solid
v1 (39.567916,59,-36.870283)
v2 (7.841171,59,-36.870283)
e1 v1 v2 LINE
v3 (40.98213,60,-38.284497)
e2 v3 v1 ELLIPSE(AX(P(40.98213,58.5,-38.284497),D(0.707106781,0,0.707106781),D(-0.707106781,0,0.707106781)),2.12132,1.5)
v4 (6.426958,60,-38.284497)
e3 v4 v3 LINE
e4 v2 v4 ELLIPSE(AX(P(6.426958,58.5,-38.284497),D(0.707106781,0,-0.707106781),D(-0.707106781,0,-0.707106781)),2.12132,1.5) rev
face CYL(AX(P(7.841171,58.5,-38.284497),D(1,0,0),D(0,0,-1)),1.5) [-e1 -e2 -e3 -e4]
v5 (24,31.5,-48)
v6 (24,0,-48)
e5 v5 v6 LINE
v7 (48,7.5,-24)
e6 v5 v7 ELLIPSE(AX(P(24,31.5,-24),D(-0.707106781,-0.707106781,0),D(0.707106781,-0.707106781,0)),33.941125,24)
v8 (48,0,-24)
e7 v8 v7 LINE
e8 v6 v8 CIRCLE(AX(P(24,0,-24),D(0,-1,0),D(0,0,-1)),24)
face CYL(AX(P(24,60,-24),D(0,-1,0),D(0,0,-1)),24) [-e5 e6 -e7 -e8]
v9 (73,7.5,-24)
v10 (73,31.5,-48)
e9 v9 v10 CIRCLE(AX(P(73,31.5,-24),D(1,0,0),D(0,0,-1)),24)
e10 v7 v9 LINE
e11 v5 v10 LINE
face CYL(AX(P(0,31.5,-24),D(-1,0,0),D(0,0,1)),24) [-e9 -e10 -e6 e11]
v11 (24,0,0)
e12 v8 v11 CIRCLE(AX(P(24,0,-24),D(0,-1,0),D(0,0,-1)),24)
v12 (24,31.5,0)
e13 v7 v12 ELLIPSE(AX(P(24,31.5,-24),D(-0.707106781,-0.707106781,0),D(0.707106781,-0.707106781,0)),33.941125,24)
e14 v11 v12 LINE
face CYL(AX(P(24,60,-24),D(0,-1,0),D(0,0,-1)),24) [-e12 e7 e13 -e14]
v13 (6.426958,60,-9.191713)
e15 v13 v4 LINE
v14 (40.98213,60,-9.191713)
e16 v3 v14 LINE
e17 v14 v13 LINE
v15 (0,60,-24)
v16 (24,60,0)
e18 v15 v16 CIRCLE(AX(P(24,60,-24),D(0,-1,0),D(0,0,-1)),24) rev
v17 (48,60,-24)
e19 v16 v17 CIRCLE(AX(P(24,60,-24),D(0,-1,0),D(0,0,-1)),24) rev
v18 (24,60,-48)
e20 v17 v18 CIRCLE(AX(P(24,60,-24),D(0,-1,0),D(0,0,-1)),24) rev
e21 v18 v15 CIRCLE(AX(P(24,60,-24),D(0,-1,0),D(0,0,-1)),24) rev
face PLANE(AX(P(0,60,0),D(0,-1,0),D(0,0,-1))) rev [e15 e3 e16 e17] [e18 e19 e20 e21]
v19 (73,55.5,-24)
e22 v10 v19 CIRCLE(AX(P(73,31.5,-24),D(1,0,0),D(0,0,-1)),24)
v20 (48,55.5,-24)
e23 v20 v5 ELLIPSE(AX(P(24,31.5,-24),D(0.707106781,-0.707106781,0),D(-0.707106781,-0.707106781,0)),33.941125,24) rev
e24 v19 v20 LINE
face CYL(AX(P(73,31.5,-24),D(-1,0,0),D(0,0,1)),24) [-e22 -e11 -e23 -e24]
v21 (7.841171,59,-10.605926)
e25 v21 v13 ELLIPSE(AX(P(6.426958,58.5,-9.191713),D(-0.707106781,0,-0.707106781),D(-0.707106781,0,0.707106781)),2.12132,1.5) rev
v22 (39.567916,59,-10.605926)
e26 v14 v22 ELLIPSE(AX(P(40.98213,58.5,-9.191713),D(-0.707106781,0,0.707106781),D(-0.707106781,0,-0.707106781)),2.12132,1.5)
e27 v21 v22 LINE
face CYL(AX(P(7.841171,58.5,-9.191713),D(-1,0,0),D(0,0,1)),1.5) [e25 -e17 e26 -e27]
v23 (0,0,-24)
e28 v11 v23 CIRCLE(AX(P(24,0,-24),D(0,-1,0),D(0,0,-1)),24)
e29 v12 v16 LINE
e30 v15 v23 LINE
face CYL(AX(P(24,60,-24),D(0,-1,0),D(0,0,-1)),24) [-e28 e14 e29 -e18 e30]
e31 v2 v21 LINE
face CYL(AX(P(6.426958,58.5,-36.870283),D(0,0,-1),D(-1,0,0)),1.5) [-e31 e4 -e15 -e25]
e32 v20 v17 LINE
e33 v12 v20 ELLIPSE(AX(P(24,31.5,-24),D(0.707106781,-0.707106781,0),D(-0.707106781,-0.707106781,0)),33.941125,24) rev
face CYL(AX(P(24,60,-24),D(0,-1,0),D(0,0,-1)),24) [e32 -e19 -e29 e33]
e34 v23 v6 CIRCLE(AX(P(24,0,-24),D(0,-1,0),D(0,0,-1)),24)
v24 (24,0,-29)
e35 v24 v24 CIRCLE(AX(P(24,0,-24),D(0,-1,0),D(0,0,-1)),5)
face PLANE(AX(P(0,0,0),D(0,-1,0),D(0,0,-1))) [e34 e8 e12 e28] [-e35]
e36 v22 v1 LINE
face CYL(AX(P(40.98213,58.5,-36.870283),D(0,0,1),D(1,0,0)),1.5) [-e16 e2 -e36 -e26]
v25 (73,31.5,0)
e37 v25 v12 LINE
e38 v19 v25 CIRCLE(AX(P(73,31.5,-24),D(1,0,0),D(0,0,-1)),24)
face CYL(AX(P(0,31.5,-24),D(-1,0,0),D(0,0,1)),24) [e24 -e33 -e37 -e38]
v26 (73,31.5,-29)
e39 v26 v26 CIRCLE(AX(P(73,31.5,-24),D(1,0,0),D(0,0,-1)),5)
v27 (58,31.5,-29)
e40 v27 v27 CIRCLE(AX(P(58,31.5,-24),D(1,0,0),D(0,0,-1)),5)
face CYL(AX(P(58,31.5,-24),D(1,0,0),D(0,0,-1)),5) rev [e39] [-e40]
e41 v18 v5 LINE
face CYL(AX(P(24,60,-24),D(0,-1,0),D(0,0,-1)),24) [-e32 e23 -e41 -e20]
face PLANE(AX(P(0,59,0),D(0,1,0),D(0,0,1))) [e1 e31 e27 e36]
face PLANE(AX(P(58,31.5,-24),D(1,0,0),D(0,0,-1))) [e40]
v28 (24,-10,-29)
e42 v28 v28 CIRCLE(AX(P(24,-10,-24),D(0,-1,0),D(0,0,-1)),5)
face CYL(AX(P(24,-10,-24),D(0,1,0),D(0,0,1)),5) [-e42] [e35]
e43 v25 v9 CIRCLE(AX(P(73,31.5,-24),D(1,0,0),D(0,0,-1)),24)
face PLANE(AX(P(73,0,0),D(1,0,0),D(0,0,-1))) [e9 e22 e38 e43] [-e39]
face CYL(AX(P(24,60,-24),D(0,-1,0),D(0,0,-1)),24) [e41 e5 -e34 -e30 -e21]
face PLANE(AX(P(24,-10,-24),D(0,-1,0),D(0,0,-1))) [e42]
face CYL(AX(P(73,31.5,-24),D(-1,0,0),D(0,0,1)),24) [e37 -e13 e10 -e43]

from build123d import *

# Parameters (mm, degrees)
SKETCH1_W           = 48
SKETCH1_H           = 48
BOSS_EXTRUDE1_DEPTH = 60
SKETCH2_W           = 48
SKETCH2_H           = 48
BOSS_EXTRUDE2_DEPTH = 25
FILLET1_R           = 24
SKETCH3_R           = 5
BOSS_EXTRUDE3_DEPTH = 10
SKETCH4_R           = 5
CUT_EXTRUDE1_DEPTH  = 15
SKETCH5_W           = 31.72674495
SKETCH5_H           = 26.264357258
CUT_EXTRUDE2_DEPTH  = 2
SKETCH8_W           = 31.72674495
SKETCH8_H           = 26.264357258
BOSS_EXTRUDE6_DEPTH = 1
FILLET3_R           = 1.5


# Some blends are built 0.0001 mm under size
with BuildPart() as part:
    # Sketch1 → Boss-Extrude1 (new body)
    with BuildSketch(Plane(origin=(0, 0, 0), x_dir=(1, 0, 0), z_dir=(0, 1, 0))):
        with Locations((24, 24)):
            Rectangle(SKETCH1_W, SKETCH1_H)
    extrude(amount=BOSS_EXTRUDE1_DEPTH)

    # Sketch2 → Boss-Extrude2 (add)
    with BuildSketch(Plane(origin=(48, 0, 0), x_dir=(0, 0, -1), z_dir=(1, 0, 0))):
        with Locations((24, 31.5)):
            Rectangle(SKETCH2_W, SKETCH2_H)
    extrude(amount=BOSS_EXTRUDE2_DEPTH)

    # Fillet1
    fillet1_edges = [part.edges().sort_by_distance(p)[0] for p in [
        (0, 30, 0),
        (0, 30, -48),
        (48, 57.75, -48),
        (48, 57.75, 0),
        (48, 3.75, -48),
        (48, 3.75, 0),
        (60.5, 7.5, 0),
        (60.5, 55.5, 0),
        (60.5, 7.5, -48),
        (60.5, 55.5, -48),
    ]]
    fillet(fillet1_edges, radius=FILLET1_R - 0.0001)  # a hair under: the kernel refuses the full size

    # Sketch3 → Boss-Extrude3 (add)
    with BuildSketch(Plane(origin=(0, 0, 0), x_dir=(-1, 0, 0), z_dir=(0, -1, 0))):
        with Locations(Location((-24, 24, 0), (0, 0, 90))):
            Circle(SKETCH3_R)
    extrude(amount=BOSS_EXTRUDE3_DEPTH)

    # Sketch4 → Cut-Extrude1 (cut)
    with BuildSketch(Plane(origin=(73, 0, 0), x_dir=(0, 0, -1), z_dir=(1, 0, 0))):
        with Locations((24, 31.5)):
            Circle(SKETCH4_R)
    extrude(amount=-CUT_EXTRUDE1_DEPTH, mode=Mode.SUBTRACT)

    # Sketch5 → Cut-Extrude2 (cut)
    with BuildSketch(Plane(origin=(0, 60, 0), x_dir=(1, 0, 0), z_dir=(0, 1, 0))):
        with Locations((23.7045439, 23.7381047)):
            Rectangle(SKETCH5_W, SKETCH5_H)
    extrude(amount=-CUT_EXTRUDE2_DEPTH, mode=Mode.SUBTRACT)

    # Sketch8 → Boss-Extrude6 (add)
    with BuildSketch(Plane(origin=(0, 58, 0), x_dir=(1, 0, 0), z_dir=(0, 1, 0))):
        with Locations((23.7045439, 23.7381047)):
            Rectangle(SKETCH8_W, SKETCH8_H)
    extrude(amount=BOSS_EXTRUDE6_DEPTH)

    # Fillet3
    # the kernel refuses this fillet: 1.5 mm, written as the material it takes off along each edge
    with BuildSketch(Plane(origin=(39.567916375, 60, -10.605926071), x_dir=(0, 0, 1), z_dir=(-1, 0, 0)), Plane(origin=(7.841171425, 60, -36.870283329), x_dir=(0, 0, -1), z_dir=(1, 0, 0))) as fillet3_piece_1:
        with BuildLine():
            CenterArc((1.414213562, -1.5), FILLET3_R, 90, 70.528779366)
            Line((0, -1), (-0.028284271, -0.99))
            ThreePointArc((-0.028284271, -0.99), (-0.03, -0.5), (-0.03, 0))
            Line((-0.03, 0), (0, 0.03))
            Line((0, 0.03), (1.414213562, 0.03))
            Line((1.414213562, 0.03), (1.414213562, 0))
        make_face()
    extrude(amount=31.72674495, mode=Mode.SUBTRACT)
    with BuildSketch(Plane(origin=(39.567916375, 60, -36.870283329), x_dir=(1, 0, 0), z_dir=(0, 0, 1)), Plane(origin=(7.841171425, 60, -10.605926071), x_dir=(-1, 0, 0), z_dir=(0, 0, -1))) as fillet3_piece_2:
        with BuildLine():
            CenterArc((1.414213562, -1.5), FILLET3_R, 90, 70.528779366)
            Line((0, -1), (-0.028284271, -0.99))
            ThreePointArc((-0.028284271, -0.99), (-0.03, -0.5), (-0.03, 0))
            Line((-0.03, 0), (0, 0.03))
            Line((0, 0.03), (1.414213562, 0.03))
            Line((1.414213562, 0.03), (1.414213562, 0))
        make_face()
    extrude(amount=26.264357258, mode=Mode.SUBTRACT)
    with BuildSketch(Plane(origin=(43.103450281, 60, -10.605926071), x_dir=(0, 0, 1), z_dir=(-1, 0, 0))) as fillet3_piece_3a_section:
        with BuildLine():
            CenterArc((1.414213562, -1.5), FILLET3_R, 90, 70.528779366)
            Line((0, -1), (-0.028284271, -0.99))
            ThreePointArc((-0.028284271, -0.99), (-0.03, -0.5), (-0.03, 0))
            Line((-0.03, 0), (0, 0.03))
            Line((0, 0.03), (1.414213562, 0.03))
            Line((1.414213562, 0.03), (1.414213562, 0))
        make_face()
    fillet3_piece_3a = extrude(amount=35.262278856, mode=Mode.PRIVATE)
    fillet3_piece_3a = split(fillet3_piece_3a, bisect_by=Plane(origin=(39.567916375, 59.743234105, -10.266766855), z_dir=(1, 0, 0)), keep=Keep.TOP, mode=Mode.PRIVATE)
    with BuildSketch(Plane(origin=(39.567916375, 60, -36.870283329), x_dir=(1, 0, 0), z_dir=(0, 0, 1))) as fillet3_piece_3b_section:
        with BuildLine():
            CenterArc((1.414213562, -1.5), FILLET3_R, 90, 70.528779366)
            Line((0, -1), (-0.028284271, -0.99))
            ThreePointArc((-0.028284271, -0.99), (-0.03, -0.5), (-0.03, 0))
            Line((-0.03, 0), (0, 0.03))
            Line((0, 0.03), (1.414213562, 0.03))
            Line((1.414213562, 0.03), (1.414213562, 0))
        make_face()
    fillet3_piece_3b = extrude(amount=29.799891164, mode=Mode.PRIVATE)
    fillet3_piece_3b = split(fillet3_piece_3b, bisect_by=Plane(origin=(39.90707559, 59.743234105, -10.605926071), z_dir=(0, 0, 1)), keep=Keep.TOP, mode=Mode.PRIVATE)
    fillet3_piece_3 = fillet3_piece_3a & fillet3_piece_3b
    add(fillet3_piece_3, mode=Mode.SUBTRACT)
    with BuildSketch(Plane(origin=(7.841171425, 60, -7.070392165), x_dir=(-1, 0, 0), z_dir=(0, 0, -1))) as fillet3_piece_4a_section:
        with BuildLine():
            CenterArc((1.414213562, -1.5), FILLET3_R, 90, 70.528779366)
            Line((0, -1), (-0.028284271, -0.99))
            ThreePointArc((-0.028284271, -0.99), (-0.03, -0.5), (-0.03, 0))
            Line((-0.03, 0), (0, 0.03))
            Line((0, 0.03), (1.414213562, 0.03))
            Line((1.414213562, 0.03), (1.414213562, 0))
        make_face()
    fillet3_piece_4a = extrude(amount=29.799891164, mode=Mode.PRIVATE)
    fillet3_piece_4a = split(fillet3_piece_4a, bisect_by=Plane(origin=(7.50201221, 59.743234105, -10.605926071), z_dir=(0, 0, 1)), keep=Keep.TOP, mode=Mode.PRIVATE)
    with BuildSketch(Plane(origin=(39.567916375, 60, -10.605926071), x_dir=(0, 0, 1), z_dir=(-1, 0, 0))) as fillet3_piece_4b_section:
        with BuildLine():
            CenterArc((1.414213562, -1.5), FILLET3_R, 90, 70.528779366)
            Line((0, -1), (-0.028284271, -0.99))
            ThreePointArc((-0.028284271, -0.99), (-0.03, -0.5), (-0.03, 0))
            Line((-0.03, 0), (0, 0.03))
            Line((0, 0.03), (1.414213562, 0.03))
            Line((1.414213562, 0.03), (1.414213562, 0))
        make_face()
    fillet3_piece_4b = extrude(amount=35.262278856, mode=Mode.PRIVATE)
    fillet3_piece_4b = split(fillet3_piece_4b, bisect_by=Plane(origin=(7.841171425, 59.743234105, -10.266766855), z_dir=(-1, 0, 0)), keep=Keep.TOP, mode=Mode.PRIVATE)
    fillet3_piece_4 = fillet3_piece_4a & fillet3_piece_4b
    add(fillet3_piece_4, mode=Mode.SUBTRACT)
    with BuildSketch(Plane(origin=(39.567916375, 60, -40.405817235), x_dir=(1, 0, 0), z_dir=(0, 0, 1))) as fillet3_piece_5a_section:
        with BuildLine():
            CenterArc((1.414213562, -1.5), FILLET3_R, 90, 70.528779366)
            Line((0, -1), (-0.028284271, -0.99))
            ThreePointArc((-0.028284271, -0.99), (-0.03, -0.5), (-0.03, 0))
            Line((-0.03, 0), (0, 0.03))
            Line((0, 0.03), (1.414213562, 0.03))
            Line((1.414213562, 0.03), (1.414213562, 0))
        make_face()
    fillet3_piece_5a = extrude(amount=29.799891164, mode=Mode.PRIVATE)
    fillet3_piece_5a = split(fillet3_piece_5a, bisect_by=Plane(origin=(39.90707559, 59.743234105, -36.870283329), z_dir=(0, 0, -1)), keep=Keep.TOP, mode=Mode.PRIVATE)
    with BuildSketch(Plane(origin=(7.841171425, 60, -36.870283329), x_dir=(0, 0, -1), z_dir=(1, 0, 0))) as fillet3_piece_5b_section:
        with BuildLine():
            CenterArc((1.414213562, -1.5), FILLET3_R, 90, 70.528779366)
            Line((0, -1), (-0.028284271, -0.99))
            ThreePointArc((-0.028284271, -0.99), (-0.03, -0.5), (-0.03, 0))
            Line((-0.03, 0), (0, 0.03))
            Line((0, 0.03), (1.414213562, 0.03))
            Line((1.414213562, 0.03), (1.414213562, 0))
        make_face()
    fillet3_piece_5b = extrude(amount=35.262278856, mode=Mode.PRIVATE)
    fillet3_piece_5b = split(fillet3_piece_5b, bisect_by=Plane(origin=(39.567916375, 59.743234105, -37.209442544), z_dir=(1, 0, 0)), keep=Keep.TOP, mode=Mode.PRIVATE)
    fillet3_piece_5 = fillet3_piece_5a & fillet3_piece_5b
    add(fillet3_piece_5, mode=Mode.SUBTRACT)
    with BuildSketch(Plane(origin=(7.841171425, 60, -10.605926071), x_dir=(-1, 0, 0), z_dir=(0, 0, -1))) as fillet3_piece_6a_section:
        with BuildLine():
            CenterArc((1.414213562, -1.5), FILLET3_R, 90, 70.528779366)
            Line((0, -1), (-0.028284271, -0.99))
            ThreePointArc((-0.028284271, -0.99), (-0.03, -0.5), (-0.03, 0))
            Line((-0.03, 0), (0, 0.03))
            Line((0, 0.03), (1.414213562, 0.03))
            Line((1.414213562, 0.03), (1.414213562, 0))
        make_face()
    fillet3_piece_6a = extrude(amount=29.799891164, mode=Mode.PRIVATE)
    fillet3_piece_6a = split(fillet3_piece_6a, bisect_by=Plane(origin=(7.50201221, 59.743234105, -36.870283329), z_dir=(0, 0, -1)), keep=Keep.TOP, mode=Mode.PRIVATE)
    with BuildSketch(Plane(origin=(4.305637519, 60, -36.870283329), x_dir=(0, 0, -1), z_dir=(1, 0, 0))) as fillet3_piece_6b_section:
        with BuildLine():
            CenterArc((1.414213562, -1.5), FILLET3_R, 90, 70.528779366)
            Line((0, -1), (-0.028284271, -0.99))
            ThreePointArc((-0.028284271, -0.99), (-0.03, -0.5), (-0.03, 0))
            Line((-0.03, 0), (0, 0.03))
            Line((0, 0.03), (1.414213562, 0.03))
            Line((1.414213562, 0.03), (1.414213562, 0))
        make_face()
    fillet3_piece_6b = extrude(amount=35.262278856, mode=Mode.PRIVATE)
    fillet3_piece_6b = split(fillet3_piece_6b, bisect_by=Plane(origin=(7.841171425, 59.743234105, -37.209442544), z_dir=(-1, 0, 0)), keep=Keep.TOP, mode=Mode.PRIVATE)
    fillet3_piece_6 = fillet3_piece_6a & fillet3_piece_6b
    add(fillet3_piece_6, mode=Mode.SUBTRACT)


solid = part.part
